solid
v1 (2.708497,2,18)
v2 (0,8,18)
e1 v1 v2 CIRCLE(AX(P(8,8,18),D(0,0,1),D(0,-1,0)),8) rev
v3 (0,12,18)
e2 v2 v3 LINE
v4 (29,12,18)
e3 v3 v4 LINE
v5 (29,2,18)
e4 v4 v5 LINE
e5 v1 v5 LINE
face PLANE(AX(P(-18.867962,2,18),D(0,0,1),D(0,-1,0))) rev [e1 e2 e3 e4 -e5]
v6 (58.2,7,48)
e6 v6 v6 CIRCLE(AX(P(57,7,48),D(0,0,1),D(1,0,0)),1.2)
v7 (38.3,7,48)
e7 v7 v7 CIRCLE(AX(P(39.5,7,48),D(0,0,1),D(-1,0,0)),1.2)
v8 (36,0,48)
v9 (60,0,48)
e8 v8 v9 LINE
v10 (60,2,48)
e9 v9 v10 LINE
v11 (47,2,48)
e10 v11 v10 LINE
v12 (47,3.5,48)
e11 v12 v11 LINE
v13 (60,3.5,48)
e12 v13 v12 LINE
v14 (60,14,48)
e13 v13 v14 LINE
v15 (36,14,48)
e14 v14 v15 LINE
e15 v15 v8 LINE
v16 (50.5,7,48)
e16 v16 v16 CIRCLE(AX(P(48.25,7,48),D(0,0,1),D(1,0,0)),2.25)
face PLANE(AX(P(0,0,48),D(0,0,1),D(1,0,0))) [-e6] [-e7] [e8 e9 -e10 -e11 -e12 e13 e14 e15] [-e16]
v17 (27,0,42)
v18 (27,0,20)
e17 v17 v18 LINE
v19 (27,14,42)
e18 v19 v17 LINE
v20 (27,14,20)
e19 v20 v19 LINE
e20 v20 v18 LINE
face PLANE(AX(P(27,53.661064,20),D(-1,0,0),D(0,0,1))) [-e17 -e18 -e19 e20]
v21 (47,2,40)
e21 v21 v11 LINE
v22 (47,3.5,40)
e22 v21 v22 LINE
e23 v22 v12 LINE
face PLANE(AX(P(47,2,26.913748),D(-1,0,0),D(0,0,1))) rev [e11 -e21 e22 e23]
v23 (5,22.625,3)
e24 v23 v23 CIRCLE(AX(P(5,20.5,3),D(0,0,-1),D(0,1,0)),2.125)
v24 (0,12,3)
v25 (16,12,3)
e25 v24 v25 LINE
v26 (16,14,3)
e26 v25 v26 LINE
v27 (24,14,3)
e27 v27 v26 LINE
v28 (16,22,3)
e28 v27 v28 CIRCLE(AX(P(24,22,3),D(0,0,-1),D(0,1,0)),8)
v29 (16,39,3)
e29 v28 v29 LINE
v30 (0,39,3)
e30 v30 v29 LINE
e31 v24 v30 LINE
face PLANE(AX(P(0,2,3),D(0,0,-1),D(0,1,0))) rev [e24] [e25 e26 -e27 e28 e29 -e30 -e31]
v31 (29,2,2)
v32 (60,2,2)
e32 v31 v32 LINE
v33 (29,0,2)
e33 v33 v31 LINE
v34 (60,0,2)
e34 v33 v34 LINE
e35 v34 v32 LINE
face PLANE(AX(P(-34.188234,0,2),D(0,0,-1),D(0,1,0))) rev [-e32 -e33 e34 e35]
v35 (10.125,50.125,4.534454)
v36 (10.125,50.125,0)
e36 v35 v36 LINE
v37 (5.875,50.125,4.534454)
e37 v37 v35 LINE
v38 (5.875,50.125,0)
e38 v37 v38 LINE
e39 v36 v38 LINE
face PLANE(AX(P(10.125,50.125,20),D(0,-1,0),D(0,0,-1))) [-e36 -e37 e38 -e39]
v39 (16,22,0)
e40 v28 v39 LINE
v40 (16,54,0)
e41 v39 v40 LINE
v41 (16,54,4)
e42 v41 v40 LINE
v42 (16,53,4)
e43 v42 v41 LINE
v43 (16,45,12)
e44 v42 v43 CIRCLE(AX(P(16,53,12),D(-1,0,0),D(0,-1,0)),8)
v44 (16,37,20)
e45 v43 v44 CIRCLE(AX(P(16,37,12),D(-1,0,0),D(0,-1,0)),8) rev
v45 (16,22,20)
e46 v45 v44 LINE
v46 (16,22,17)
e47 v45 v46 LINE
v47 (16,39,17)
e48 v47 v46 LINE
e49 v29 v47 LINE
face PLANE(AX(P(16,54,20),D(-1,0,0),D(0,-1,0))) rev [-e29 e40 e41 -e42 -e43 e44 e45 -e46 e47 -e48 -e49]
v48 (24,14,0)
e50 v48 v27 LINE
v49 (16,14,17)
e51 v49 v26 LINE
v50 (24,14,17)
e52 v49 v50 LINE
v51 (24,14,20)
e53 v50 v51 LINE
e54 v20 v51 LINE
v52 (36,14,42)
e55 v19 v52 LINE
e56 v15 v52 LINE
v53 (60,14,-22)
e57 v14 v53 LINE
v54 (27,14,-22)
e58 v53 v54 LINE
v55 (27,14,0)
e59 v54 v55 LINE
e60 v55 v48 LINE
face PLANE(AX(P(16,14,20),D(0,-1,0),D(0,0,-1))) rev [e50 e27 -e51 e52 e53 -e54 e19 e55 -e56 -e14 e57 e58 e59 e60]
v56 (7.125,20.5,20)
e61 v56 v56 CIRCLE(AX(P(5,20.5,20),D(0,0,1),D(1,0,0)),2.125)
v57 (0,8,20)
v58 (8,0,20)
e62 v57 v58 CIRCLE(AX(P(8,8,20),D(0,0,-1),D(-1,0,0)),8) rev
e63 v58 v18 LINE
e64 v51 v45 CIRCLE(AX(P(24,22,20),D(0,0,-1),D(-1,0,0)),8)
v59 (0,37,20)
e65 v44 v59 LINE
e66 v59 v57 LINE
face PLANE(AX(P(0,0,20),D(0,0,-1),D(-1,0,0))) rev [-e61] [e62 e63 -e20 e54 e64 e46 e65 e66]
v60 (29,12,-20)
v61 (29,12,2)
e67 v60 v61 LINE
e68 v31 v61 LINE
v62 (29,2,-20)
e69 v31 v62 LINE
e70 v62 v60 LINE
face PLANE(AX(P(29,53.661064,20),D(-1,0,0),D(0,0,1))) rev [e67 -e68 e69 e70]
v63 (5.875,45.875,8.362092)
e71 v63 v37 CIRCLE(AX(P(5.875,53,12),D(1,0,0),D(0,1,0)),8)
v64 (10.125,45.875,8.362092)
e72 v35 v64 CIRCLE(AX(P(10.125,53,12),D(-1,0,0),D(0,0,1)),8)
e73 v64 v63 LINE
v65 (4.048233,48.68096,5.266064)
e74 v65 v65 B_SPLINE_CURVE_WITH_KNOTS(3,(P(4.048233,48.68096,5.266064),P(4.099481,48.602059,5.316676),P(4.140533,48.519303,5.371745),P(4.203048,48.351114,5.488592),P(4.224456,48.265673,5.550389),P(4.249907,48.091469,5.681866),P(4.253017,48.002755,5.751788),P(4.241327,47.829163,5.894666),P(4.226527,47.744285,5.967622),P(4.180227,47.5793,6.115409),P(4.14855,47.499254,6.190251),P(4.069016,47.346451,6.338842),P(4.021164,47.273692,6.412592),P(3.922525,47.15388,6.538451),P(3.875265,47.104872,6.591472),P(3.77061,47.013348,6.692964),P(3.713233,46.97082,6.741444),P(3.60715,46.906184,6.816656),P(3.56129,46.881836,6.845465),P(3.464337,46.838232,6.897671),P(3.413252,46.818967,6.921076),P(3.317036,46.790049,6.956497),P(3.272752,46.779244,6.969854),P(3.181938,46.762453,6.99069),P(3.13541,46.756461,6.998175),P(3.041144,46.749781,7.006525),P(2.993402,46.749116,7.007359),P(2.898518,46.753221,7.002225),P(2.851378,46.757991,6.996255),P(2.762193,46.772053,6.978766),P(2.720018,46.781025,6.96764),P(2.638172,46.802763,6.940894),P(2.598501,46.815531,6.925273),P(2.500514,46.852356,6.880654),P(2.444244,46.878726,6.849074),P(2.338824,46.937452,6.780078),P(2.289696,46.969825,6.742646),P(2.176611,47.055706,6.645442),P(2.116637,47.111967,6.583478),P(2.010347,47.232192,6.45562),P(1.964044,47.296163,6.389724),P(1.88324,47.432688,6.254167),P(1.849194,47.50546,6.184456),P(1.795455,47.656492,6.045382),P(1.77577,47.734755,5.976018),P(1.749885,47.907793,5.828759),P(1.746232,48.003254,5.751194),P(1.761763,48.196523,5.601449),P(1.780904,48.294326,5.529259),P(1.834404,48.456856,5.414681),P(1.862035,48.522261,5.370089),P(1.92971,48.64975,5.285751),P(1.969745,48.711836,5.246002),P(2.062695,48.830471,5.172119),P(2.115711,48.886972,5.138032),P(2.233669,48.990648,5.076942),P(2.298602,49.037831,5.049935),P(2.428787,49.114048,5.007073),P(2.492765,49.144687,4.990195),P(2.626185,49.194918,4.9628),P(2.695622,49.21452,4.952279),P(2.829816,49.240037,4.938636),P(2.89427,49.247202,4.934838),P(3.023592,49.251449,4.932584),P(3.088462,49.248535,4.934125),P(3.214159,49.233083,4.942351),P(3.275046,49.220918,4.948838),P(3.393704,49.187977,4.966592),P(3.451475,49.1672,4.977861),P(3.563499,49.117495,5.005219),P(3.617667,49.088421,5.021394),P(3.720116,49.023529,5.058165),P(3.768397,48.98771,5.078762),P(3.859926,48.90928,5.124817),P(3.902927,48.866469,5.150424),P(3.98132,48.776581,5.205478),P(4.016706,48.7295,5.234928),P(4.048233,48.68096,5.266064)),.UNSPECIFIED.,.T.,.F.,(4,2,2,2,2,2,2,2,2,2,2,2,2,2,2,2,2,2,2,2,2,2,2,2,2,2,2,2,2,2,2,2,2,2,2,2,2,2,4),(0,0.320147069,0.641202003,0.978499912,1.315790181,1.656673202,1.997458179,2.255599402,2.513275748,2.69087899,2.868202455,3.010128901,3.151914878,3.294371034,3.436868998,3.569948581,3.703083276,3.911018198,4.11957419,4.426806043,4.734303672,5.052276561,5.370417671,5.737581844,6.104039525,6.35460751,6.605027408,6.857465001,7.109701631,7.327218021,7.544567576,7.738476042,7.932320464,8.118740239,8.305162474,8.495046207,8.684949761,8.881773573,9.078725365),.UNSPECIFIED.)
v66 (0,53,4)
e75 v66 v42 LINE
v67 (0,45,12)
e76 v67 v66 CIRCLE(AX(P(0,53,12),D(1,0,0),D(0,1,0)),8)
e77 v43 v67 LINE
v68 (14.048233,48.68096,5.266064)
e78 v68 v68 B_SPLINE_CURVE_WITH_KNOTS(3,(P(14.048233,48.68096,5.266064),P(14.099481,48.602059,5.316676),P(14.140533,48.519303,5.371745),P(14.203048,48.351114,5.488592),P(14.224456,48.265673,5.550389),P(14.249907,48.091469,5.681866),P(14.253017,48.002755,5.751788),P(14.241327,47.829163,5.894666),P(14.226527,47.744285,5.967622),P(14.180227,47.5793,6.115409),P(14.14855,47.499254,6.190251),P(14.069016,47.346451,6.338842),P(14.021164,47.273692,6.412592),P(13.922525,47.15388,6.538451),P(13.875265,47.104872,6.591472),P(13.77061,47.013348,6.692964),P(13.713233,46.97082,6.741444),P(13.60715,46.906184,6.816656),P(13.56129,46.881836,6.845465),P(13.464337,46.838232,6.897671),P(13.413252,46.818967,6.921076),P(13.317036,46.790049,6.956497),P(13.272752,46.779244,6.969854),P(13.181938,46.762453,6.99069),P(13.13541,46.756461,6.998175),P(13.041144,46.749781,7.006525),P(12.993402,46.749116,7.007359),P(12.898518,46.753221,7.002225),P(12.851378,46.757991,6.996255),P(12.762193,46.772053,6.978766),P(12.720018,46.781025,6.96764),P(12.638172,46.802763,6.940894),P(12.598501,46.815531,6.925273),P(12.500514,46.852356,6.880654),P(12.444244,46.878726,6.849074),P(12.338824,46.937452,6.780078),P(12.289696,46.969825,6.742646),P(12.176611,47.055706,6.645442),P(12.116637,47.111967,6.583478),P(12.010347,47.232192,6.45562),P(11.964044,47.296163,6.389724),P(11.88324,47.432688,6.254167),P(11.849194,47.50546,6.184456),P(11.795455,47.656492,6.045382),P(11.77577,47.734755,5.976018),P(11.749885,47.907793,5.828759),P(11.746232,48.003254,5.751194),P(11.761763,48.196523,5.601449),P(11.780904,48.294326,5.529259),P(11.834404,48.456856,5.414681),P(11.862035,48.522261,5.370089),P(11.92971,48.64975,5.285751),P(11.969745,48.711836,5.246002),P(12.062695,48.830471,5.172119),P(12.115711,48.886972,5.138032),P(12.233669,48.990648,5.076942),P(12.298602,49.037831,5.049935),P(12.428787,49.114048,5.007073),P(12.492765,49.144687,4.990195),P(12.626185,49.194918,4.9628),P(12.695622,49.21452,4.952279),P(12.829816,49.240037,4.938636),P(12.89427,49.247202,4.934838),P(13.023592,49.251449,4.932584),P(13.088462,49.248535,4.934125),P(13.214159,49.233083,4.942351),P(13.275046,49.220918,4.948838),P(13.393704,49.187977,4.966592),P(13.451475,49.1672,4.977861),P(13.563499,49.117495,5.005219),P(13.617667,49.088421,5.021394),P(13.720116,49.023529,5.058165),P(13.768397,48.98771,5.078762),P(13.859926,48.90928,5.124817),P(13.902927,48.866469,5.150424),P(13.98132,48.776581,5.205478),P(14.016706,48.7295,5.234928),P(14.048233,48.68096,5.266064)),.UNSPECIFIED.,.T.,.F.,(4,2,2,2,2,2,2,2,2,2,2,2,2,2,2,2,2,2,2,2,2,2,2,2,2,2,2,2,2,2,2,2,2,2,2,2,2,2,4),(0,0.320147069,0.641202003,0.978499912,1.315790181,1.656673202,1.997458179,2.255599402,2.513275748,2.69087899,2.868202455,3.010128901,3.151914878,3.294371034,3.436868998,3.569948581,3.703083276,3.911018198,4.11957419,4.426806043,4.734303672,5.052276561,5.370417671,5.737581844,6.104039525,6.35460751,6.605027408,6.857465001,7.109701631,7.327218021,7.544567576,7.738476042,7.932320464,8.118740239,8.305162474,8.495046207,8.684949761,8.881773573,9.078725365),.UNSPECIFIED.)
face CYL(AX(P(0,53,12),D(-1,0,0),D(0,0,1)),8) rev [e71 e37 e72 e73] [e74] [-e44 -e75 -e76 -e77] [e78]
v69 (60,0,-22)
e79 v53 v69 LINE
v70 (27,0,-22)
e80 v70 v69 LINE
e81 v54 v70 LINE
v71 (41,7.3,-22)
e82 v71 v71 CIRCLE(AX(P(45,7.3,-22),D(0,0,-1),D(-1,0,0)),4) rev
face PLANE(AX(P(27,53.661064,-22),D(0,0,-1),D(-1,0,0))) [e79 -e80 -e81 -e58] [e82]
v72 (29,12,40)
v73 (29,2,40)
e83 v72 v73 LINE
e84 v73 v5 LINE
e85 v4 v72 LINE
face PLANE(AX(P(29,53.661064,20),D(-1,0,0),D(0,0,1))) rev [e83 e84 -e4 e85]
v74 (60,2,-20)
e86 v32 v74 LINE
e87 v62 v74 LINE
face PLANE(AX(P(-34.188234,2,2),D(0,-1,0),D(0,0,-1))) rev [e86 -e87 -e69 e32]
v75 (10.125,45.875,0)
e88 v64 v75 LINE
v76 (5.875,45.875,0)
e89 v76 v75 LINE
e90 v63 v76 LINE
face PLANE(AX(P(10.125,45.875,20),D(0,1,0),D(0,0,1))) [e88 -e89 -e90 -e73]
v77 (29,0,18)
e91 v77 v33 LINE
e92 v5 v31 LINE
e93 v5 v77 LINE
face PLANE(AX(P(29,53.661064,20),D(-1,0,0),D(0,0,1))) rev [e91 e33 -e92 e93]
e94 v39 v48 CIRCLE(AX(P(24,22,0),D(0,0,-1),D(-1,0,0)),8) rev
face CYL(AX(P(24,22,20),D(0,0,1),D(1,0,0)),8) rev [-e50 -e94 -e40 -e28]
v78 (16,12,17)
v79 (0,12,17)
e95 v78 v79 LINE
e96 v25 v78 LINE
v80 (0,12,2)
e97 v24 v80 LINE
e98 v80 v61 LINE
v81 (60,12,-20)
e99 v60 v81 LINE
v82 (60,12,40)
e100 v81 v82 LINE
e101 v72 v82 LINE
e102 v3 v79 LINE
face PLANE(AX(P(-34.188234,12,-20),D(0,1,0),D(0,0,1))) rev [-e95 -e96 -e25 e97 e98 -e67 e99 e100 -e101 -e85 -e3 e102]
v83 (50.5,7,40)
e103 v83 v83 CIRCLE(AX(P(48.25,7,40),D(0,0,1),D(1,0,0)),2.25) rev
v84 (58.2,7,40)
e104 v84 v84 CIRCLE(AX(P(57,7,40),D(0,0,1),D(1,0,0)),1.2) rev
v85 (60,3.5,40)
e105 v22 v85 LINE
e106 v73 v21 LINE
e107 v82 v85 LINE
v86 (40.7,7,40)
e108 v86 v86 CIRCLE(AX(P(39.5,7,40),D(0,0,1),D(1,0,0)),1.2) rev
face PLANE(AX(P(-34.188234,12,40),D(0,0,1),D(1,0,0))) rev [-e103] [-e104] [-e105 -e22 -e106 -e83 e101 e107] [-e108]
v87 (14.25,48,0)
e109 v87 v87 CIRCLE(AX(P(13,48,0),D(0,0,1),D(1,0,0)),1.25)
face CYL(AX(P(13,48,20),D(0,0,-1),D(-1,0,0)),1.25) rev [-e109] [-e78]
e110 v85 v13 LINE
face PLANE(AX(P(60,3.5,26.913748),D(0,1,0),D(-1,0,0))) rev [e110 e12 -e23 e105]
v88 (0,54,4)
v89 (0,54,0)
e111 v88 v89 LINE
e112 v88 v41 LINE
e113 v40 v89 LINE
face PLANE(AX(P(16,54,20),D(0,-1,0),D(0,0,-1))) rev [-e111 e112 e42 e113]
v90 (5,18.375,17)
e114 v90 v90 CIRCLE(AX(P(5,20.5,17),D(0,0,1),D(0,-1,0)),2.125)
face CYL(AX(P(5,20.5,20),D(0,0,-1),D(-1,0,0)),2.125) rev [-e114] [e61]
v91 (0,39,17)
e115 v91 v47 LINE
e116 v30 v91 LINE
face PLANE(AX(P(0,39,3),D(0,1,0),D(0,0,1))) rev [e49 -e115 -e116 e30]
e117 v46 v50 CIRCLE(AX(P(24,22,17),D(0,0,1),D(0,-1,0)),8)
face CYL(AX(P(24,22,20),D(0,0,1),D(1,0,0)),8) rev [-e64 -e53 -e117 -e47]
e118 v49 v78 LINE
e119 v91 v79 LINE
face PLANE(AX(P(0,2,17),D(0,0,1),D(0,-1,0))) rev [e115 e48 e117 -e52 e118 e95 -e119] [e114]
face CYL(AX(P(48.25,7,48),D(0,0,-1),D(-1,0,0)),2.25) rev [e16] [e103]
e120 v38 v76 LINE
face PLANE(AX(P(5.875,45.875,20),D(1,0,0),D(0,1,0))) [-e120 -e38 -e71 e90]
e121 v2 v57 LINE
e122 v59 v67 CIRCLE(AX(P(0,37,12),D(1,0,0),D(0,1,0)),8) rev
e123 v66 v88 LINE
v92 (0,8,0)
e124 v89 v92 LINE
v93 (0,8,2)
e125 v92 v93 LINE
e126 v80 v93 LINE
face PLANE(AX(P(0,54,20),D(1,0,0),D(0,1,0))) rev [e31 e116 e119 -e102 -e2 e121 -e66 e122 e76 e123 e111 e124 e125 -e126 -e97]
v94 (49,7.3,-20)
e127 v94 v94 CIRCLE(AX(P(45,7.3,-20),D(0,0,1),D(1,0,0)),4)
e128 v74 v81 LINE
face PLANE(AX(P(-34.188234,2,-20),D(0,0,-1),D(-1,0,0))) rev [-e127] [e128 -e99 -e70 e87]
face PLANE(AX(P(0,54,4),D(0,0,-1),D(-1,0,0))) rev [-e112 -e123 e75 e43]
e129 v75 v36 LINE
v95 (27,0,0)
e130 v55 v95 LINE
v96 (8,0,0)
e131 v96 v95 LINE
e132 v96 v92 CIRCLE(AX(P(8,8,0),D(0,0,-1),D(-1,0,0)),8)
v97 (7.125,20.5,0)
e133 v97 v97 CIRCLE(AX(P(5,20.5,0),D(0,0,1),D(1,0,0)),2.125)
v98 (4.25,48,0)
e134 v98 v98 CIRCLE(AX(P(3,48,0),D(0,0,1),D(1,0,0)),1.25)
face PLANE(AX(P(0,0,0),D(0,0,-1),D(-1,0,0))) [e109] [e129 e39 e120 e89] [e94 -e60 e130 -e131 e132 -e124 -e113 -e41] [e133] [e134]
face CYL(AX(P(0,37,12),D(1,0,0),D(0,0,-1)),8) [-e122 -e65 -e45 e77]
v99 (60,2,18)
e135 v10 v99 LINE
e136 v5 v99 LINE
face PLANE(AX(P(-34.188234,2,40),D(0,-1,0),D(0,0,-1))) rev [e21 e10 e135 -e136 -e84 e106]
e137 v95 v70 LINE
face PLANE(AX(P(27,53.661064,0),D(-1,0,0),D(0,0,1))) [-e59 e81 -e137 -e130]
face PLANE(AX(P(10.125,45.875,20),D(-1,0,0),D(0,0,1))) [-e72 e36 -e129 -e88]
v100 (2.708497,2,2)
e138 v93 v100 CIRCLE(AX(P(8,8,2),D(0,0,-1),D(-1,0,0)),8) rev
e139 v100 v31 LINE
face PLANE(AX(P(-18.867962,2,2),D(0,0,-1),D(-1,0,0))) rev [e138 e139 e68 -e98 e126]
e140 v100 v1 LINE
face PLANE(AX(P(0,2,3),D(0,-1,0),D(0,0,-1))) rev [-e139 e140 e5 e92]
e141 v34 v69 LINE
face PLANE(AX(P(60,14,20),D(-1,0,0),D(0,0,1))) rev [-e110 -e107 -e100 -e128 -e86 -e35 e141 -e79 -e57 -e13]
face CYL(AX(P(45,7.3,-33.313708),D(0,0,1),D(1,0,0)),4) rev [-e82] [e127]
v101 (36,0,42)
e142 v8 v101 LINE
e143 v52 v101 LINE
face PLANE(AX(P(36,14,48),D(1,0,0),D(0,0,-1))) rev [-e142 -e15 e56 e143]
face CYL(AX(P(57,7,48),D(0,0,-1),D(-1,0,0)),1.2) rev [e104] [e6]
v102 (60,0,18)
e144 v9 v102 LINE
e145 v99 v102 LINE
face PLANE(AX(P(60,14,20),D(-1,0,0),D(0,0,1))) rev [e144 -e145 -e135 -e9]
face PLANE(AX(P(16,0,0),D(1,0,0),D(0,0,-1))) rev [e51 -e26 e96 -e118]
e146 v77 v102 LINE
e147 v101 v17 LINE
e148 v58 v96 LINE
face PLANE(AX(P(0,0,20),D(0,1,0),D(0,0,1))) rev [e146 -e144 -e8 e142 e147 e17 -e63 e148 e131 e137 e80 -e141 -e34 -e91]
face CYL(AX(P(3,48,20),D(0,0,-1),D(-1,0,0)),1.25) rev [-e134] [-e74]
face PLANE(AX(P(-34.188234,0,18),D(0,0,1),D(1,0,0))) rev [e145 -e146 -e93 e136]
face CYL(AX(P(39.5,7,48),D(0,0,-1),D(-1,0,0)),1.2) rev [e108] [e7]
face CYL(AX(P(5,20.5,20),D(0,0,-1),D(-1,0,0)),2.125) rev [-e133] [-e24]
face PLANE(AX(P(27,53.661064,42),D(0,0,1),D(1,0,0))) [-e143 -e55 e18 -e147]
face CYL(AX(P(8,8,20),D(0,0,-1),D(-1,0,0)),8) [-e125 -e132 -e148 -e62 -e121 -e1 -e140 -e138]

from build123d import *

# Parameters (mm, degrees)
SKETCH1_R           = 2.125
SKETCH1_R_2         = 1.25
SKETCH1_W           = 4.25
SKETCH1_H           = 4.25
BOSS_EXTRUDE1_DEPTH = 20
SKETCH2_W           = 14
SKETCH2_H           = 37
SKETCH2_W_2         = 16
SKETCH2_H_2         = 9
CUT_EXTRUDE1_DEPTH  = 73.470683728
SKETCH3_W           = 33
SKETCH3_H           = 22
BOSS_EXTRUDE2_DEPTH = 14
CUT_EXTRUDE2_DEPTH  = 31
SKETCH5_W           = 16
SKETCH5_H           = 10
CUT_EXTRUDE3_DEPTH  = 29
SKETCH7_R           = 4
CUT_EXTRUDE5_DEPTH  = 2
SKETCH8_W           = 24
SKETCH8_H           = 14
SKETCH8_R           = 1.2
SKETCH8_R_2         = 2.25
BOSS_EXTRUDE3_DEPTH = 6
CUT_EXTRUDE6_START  = -8
SKETCH9_R           = 2.25
SKETCH9_R_2         = 1.2
SKETCH9_W           = 13
SKETCH9_H           = 1.5
CUT_EXTRUDE6_DEPTH  = 8
FILLET1_R           = 8


with BuildPart() as part:
    # Sketch1 → Boss-Extrude1 (new body)
    with BuildSketch(Plane.XY):
        Polygon((16, 54), (0, 54), (0, 0), (60, 0), (60, 14), (16, 14), align=None)
        with Locations((5, 20.5)):
            Circle(SKETCH1_R, mode=Mode.SUBTRACT)
        with Locations((13, 48)):
            Circle(SKETCH1_R_2, mode=Mode.SUBTRACT)
        with Locations((3, 48)):
            Circle(SKETCH1_R_2, mode=Mode.SUBTRACT)
        with Locations((8, 48)):
            Rectangle(SKETCH1_W, SKETCH1_H, mode=Mode.SUBTRACT)
    extrude(amount=BOSS_EXTRUDE1_DEPTH)

    # Sketch2 → Cut-Extrude1 (cut, through all)
    with BuildSketch(Plane(origin=(16, 0, 0), x_dir=(0, 0, -1), z_dir=(1, 0, 0))):
        with Locations((-10, 20.5)):
            Rectangle(SKETCH2_W, SKETCH2_H)
        with Locations((-12, 49.5)):
            Rectangle(SKETCH2_W_2, SKETCH2_H_2)
    extrude(amount=-CUT_EXTRUDE1_DEPTH, mode=Mode.SUBTRACT)

    # Sketch3 → Boss-Extrude2 (add)
    with BuildSketch(Plane.XZ):
        with Locations((43.5, 31)):
            Rectangle(SKETCH3_W, SKETCH3_H)
        with Locations((43.5, -11)):
            Rectangle(SKETCH3_W, SKETCH3_H)
    extrude(amount=-BOSS_EXTRUDE2_DEPTH)

    # Sketch4 → Cut-Extrude2 (cut)
    with BuildSketch(Plane(origin=(60, 0, 0), x_dir=(0, 0, -1), z_dir=(1, 0, 0))):
        Polygon((-18, 0), (-18, 2), (-40, 2), (-40, 12), (20, 12), (20, 2), (-2, 2), (-2, 0), align=None)
    extrude(amount=-CUT_EXTRUDE2_DEPTH, mode=Mode.SUBTRACT)

    # Sketch5 → Cut-Extrude3 (cut)
    with BuildSketch(Plane(origin=(29, 0, 0), x_dir=(0, 0, -1), z_dir=(1, 0, 0))):
        with Locations((-10, 7)):
            Rectangle(SKETCH5_W, SKETCH5_H)
    extrude(amount=-CUT_EXTRUDE3_DEPTH, mode=Mode.SUBTRACT)

    # Sketch7 → Cut-Extrude5 (cut)
    with BuildSketch(Plane.XY.offset(-20)):
        with Locations((45, 7.3)):
            Circle(SKETCH7_R)
    extrude(amount=-CUT_EXTRUDE5_DEPTH, mode=Mode.SUBTRACT)

    # Sketch8 → Boss-Extrude3 (add)
    with BuildSketch(Plane.XY.offset(42)):
        with Locations((48, 7)):
            Rectangle(SKETCH8_W, SKETCH8_H)
        with Locations((57, 7)):
            Circle(SKETCH8_R, mode=Mode.SUBTRACT)
        with Locations((48.25, 7)):
            Circle(SKETCH8_R_2, mode=Mode.SUBTRACT)
        with Locations(Location((39.5, 7, 0), (0, 0, 180))):
            Circle(SKETCH8_R, mode=Mode.SUBTRACT)
    extrude(amount=BOSS_EXTRUDE3_DEPTH)

    # Sketch9 → Cut-Extrude6 (cut)
    with BuildSketch(Plane.XY.offset(48).offset(CUT_EXTRUDE6_START)):
        with Locations((48.25, 7)):
            Circle(SKETCH9_R)
        with Locations((57, 7)):
            Circle(SKETCH9_R_2)
        with Locations(Location((39.5, 7, 0), (0, 0, 180))):
            Circle(SKETCH9_R_2)
        with Locations((53.5, 2.75)):
            Rectangle(SKETCH9_W, SKETCH9_H)
    extrude(amount=CUT_EXTRUDE6_DEPTH, mode=Mode.SUBTRACT)

    # Fillet1
    # the kernel refuses this fillet: 8 mm, written as the material it adds along each edge
    with BuildSketch(Plane(origin=(16, 14, 0), x_dir=(0, 1, 0), z_dir=(0, 0, 1)), Plane(origin=(16, 14, 17), x_dir=(0, 1, 0), z_dir=(0, 0, 1))) as fillet1_piece_1:
        with BuildLine():
            CenterArc((FILLET1_R, -FILLET1_R), FILLET1_R, 90, 90)
            Line((0, -FILLET1_R), (0, 0))
            Line((0, 0), (FILLET1_R, 0))
        make_face()
    extrude(amount=3)
    with BuildSketch(Plane(origin=(16, 14, -20), x_dir=(0, 1, 0), z_dir=(0, 0, 1))) as fillet1_piece_2_section:
        with BuildLine():
            CenterArc((FILLET1_R, -FILLET1_R), FILLET1_R, 90, 90)
            Line((0, -FILLET1_R), (0, 0))
            Line((0, 0), (FILLET1_R, 0))
        make_face()
    fillet1_piece_2 = extrude(amount=43, mode=Mode.PRIVATE)
    fillet1_piece_2 = split(fillet1_piece_2, bisect_by=Plane(origin=(17.786943512, 15.786943512, 17), z_dir=(0, 0, 1)), keep=Keep.TOP, mode=Mode.PRIVATE)
    fillet1_piece_2 = split(fillet1_piece_2, bisect_by=Plane(origin=(17.786943512, 15.786943512, 20), z_dir=(0, 0, -1)), keep=Keep.TOP, mode=Mode.PRIVATE)
    add(fillet1_piece_2)
    with BuildSketch(Plane(origin=(16, 14, -3), x_dir=(0, 1, 0), z_dir=(0, 0, 1))) as fillet1_piece_3_section:
        with BuildLine():
            CenterArc((FILLET1_R, -FILLET1_R), FILLET1_R, 90, 90)
            Line((0, -FILLET1_R), (0, 0))
            Line((0, 0), (FILLET1_R, 0))
        make_face()
    fillet1_piece_3 = extrude(amount=43, mode=Mode.PRIVATE)
    fillet1_piece_3 = split(fillet1_piece_3, bisect_by=Plane(origin=(17.786943512, 15.786943512, 3), z_dir=(0, 0, -1)), keep=Keep.TOP, mode=Mode.PRIVATE)
    fillet1_piece_3 = split(fillet1_piece_3, bisect_by=Plane(origin=(17.786943512, 15.786943512, 0), z_dir=(0, 0, 1)), keep=Keep.TOP, mode=Mode.PRIVATE)
    add(fillet1_piece_3)
    with BuildSketch(Plane(origin=(16, 45, 4), x_dir=(0, 0, 1), z_dir=(-1, 0, 0))) as fillet1_piece_4_section:
        with BuildLine():
            CenterArc((FILLET1_R, FILLET1_R), FILLET1_R, 180, 90)
            Line((0, FILLET1_R), (0, 0))
            Line((0, 0), (FILLET1_R, 0))
        make_face()
    fillet1_piece_4 = extrude(amount=36, mode=Mode.PRIVATE)
    fillet1_piece_4 = fillet1_piece_4 - Plane(origin=(13, 48, 6.838985296), x_dir=(1, 0, 0), z_dir=(0, 0, -1)) * Cylinder(1.25, 105, mode=Mode.PRIVATE)
    fillet1_piece_4 = split(fillet1_piece_4, bisect_by=Plane(origin=(10.125, 45.39955256, 6.838985296), z_dir=(1, 0, 0)), keep=Keep.TOP, mode=Mode.PRIVATE)
    add(fillet1_piece_4)
    with BuildSketch(Plane(origin=(36, 45, 4), x_dir=(0, 0, 1), z_dir=(-1, 0, 0))) as fillet1_piece_5_section:
        with BuildLine():
            CenterArc((FILLET1_R, FILLET1_R), FILLET1_R, 180, 90)
            Line((0, FILLET1_R), (0, 0))
            Line((0, 0), (FILLET1_R, 0))
        make_face()
    fillet1_piece_5 = extrude(amount=36, mode=Mode.PRIVATE)
    fillet1_piece_5 = split(fillet1_piece_5, bisect_by=Plane(origin=(8, 45.875, 6.838985296), z_dir=(0, -1, 0)), keep=Keep.TOP, mode=Mode.PRIVATE)
    fillet1_piece_5 = split(fillet1_piece_5, bisect_by=Plane(origin=(10.125, 45.39955256, 6.838985296), z_dir=(-1, 0, 0)), keep=Keep.TOP, mode=Mode.PRIVATE)
    add(fillet1_piece_5)
    with BuildSketch(Plane(origin=(36, 45, 4), x_dir=(0, 0, 1), z_dir=(-1, 0, 0))) as fillet1_piece_6_section:
        with BuildLine():
            CenterArc((FILLET1_R, FILLET1_R), FILLET1_R, 180, 90)
            Line((0, FILLET1_R), (0, 0))
            Line((0, 0), (FILLET1_R, 0))
        make_face()
    fillet1_piece_6 = extrude(amount=36, mode=Mode.PRIVATE)
    fillet1_piece_6 = split(fillet1_piece_6, bisect_by=Plane(origin=(8, 50.125, 4.159374376), z_dir=(0, 1, 0)), keep=Keep.TOP, mode=Mode.PRIVATE)
    fillet1_piece_6 = split(fillet1_piece_6, bisect_by=Plane(origin=(10.125, 50.838860547, 4.159374376), z_dir=(-1, 0, 0)), keep=Keep.TOP, mode=Mode.PRIVATE)
    add(fillet1_piece_6)
    with BuildSketch(Plane(origin=(36, 45, 4), x_dir=(0, 0, 1), z_dir=(-1, 0, 0))) as fillet1_piece_7_section:
        with BuildLine():
            CenterArc((FILLET1_R, FILLET1_R), FILLET1_R, 180, 90)
            Line((0, FILLET1_R), (0, 0))
            Line((0, 0), (FILLET1_R, 0))
        make_face()
    fillet1_piece_7 = extrude(amount=36, mode=Mode.PRIVATE)
    fillet1_piece_7 = split(fillet1_piece_7, bisect_by=Plane(origin=(5.875, 46.341604388, 7.503816855), z_dir=(-1, 0, 0)), keep=Keep.TOP, mode=Mode.PRIVATE)
    fillet1_piece_7 = fillet1_piece_7 - Plane(origin=(3, 48, 7.503816855), x_dir=(1, 0, 0), z_dir=(0, 0, -1)) * Cylinder(1.25, 105, mode=Mode.PRIVATE)
    add(fillet1_piece_7)
    # the kernel refuses this fillet: 8 mm, written as the material it takes off along each edge
    with BuildSketch(Plane(origin=(0, 0, -20), x_dir=(0, 1, 0), z_dir=(0, 0, 1))) as fillet1_2_piece_1:
        with BuildLine():
            CenterArc((FILLET1_R, -FILLET1_R), FILLET1_R, 90, 90)
            Line((0, -FILLET1_R), (0, 0))
            Line((0, 0), (FILLET1_R, 0))
        make_face()
    extrude(amount=60, mode=Mode.SUBTRACT)
    with BuildSketch(Plane(origin=(36, 45, 20), x_dir=(0, 0, -1), z_dir=(-1, 0, 0))) as fillet1_2_piece_2:
        with BuildLine():
            CenterArc((FILLET1_R, FILLET1_R), FILLET1_R, 180, 90)
            Line((0, FILLET1_R), (0, 0))
            Line((0, 0), (FILLET1_R, 0))
        make_face()
    extrude(amount=56, mode=Mode.SUBTRACT)


solid = part.part
